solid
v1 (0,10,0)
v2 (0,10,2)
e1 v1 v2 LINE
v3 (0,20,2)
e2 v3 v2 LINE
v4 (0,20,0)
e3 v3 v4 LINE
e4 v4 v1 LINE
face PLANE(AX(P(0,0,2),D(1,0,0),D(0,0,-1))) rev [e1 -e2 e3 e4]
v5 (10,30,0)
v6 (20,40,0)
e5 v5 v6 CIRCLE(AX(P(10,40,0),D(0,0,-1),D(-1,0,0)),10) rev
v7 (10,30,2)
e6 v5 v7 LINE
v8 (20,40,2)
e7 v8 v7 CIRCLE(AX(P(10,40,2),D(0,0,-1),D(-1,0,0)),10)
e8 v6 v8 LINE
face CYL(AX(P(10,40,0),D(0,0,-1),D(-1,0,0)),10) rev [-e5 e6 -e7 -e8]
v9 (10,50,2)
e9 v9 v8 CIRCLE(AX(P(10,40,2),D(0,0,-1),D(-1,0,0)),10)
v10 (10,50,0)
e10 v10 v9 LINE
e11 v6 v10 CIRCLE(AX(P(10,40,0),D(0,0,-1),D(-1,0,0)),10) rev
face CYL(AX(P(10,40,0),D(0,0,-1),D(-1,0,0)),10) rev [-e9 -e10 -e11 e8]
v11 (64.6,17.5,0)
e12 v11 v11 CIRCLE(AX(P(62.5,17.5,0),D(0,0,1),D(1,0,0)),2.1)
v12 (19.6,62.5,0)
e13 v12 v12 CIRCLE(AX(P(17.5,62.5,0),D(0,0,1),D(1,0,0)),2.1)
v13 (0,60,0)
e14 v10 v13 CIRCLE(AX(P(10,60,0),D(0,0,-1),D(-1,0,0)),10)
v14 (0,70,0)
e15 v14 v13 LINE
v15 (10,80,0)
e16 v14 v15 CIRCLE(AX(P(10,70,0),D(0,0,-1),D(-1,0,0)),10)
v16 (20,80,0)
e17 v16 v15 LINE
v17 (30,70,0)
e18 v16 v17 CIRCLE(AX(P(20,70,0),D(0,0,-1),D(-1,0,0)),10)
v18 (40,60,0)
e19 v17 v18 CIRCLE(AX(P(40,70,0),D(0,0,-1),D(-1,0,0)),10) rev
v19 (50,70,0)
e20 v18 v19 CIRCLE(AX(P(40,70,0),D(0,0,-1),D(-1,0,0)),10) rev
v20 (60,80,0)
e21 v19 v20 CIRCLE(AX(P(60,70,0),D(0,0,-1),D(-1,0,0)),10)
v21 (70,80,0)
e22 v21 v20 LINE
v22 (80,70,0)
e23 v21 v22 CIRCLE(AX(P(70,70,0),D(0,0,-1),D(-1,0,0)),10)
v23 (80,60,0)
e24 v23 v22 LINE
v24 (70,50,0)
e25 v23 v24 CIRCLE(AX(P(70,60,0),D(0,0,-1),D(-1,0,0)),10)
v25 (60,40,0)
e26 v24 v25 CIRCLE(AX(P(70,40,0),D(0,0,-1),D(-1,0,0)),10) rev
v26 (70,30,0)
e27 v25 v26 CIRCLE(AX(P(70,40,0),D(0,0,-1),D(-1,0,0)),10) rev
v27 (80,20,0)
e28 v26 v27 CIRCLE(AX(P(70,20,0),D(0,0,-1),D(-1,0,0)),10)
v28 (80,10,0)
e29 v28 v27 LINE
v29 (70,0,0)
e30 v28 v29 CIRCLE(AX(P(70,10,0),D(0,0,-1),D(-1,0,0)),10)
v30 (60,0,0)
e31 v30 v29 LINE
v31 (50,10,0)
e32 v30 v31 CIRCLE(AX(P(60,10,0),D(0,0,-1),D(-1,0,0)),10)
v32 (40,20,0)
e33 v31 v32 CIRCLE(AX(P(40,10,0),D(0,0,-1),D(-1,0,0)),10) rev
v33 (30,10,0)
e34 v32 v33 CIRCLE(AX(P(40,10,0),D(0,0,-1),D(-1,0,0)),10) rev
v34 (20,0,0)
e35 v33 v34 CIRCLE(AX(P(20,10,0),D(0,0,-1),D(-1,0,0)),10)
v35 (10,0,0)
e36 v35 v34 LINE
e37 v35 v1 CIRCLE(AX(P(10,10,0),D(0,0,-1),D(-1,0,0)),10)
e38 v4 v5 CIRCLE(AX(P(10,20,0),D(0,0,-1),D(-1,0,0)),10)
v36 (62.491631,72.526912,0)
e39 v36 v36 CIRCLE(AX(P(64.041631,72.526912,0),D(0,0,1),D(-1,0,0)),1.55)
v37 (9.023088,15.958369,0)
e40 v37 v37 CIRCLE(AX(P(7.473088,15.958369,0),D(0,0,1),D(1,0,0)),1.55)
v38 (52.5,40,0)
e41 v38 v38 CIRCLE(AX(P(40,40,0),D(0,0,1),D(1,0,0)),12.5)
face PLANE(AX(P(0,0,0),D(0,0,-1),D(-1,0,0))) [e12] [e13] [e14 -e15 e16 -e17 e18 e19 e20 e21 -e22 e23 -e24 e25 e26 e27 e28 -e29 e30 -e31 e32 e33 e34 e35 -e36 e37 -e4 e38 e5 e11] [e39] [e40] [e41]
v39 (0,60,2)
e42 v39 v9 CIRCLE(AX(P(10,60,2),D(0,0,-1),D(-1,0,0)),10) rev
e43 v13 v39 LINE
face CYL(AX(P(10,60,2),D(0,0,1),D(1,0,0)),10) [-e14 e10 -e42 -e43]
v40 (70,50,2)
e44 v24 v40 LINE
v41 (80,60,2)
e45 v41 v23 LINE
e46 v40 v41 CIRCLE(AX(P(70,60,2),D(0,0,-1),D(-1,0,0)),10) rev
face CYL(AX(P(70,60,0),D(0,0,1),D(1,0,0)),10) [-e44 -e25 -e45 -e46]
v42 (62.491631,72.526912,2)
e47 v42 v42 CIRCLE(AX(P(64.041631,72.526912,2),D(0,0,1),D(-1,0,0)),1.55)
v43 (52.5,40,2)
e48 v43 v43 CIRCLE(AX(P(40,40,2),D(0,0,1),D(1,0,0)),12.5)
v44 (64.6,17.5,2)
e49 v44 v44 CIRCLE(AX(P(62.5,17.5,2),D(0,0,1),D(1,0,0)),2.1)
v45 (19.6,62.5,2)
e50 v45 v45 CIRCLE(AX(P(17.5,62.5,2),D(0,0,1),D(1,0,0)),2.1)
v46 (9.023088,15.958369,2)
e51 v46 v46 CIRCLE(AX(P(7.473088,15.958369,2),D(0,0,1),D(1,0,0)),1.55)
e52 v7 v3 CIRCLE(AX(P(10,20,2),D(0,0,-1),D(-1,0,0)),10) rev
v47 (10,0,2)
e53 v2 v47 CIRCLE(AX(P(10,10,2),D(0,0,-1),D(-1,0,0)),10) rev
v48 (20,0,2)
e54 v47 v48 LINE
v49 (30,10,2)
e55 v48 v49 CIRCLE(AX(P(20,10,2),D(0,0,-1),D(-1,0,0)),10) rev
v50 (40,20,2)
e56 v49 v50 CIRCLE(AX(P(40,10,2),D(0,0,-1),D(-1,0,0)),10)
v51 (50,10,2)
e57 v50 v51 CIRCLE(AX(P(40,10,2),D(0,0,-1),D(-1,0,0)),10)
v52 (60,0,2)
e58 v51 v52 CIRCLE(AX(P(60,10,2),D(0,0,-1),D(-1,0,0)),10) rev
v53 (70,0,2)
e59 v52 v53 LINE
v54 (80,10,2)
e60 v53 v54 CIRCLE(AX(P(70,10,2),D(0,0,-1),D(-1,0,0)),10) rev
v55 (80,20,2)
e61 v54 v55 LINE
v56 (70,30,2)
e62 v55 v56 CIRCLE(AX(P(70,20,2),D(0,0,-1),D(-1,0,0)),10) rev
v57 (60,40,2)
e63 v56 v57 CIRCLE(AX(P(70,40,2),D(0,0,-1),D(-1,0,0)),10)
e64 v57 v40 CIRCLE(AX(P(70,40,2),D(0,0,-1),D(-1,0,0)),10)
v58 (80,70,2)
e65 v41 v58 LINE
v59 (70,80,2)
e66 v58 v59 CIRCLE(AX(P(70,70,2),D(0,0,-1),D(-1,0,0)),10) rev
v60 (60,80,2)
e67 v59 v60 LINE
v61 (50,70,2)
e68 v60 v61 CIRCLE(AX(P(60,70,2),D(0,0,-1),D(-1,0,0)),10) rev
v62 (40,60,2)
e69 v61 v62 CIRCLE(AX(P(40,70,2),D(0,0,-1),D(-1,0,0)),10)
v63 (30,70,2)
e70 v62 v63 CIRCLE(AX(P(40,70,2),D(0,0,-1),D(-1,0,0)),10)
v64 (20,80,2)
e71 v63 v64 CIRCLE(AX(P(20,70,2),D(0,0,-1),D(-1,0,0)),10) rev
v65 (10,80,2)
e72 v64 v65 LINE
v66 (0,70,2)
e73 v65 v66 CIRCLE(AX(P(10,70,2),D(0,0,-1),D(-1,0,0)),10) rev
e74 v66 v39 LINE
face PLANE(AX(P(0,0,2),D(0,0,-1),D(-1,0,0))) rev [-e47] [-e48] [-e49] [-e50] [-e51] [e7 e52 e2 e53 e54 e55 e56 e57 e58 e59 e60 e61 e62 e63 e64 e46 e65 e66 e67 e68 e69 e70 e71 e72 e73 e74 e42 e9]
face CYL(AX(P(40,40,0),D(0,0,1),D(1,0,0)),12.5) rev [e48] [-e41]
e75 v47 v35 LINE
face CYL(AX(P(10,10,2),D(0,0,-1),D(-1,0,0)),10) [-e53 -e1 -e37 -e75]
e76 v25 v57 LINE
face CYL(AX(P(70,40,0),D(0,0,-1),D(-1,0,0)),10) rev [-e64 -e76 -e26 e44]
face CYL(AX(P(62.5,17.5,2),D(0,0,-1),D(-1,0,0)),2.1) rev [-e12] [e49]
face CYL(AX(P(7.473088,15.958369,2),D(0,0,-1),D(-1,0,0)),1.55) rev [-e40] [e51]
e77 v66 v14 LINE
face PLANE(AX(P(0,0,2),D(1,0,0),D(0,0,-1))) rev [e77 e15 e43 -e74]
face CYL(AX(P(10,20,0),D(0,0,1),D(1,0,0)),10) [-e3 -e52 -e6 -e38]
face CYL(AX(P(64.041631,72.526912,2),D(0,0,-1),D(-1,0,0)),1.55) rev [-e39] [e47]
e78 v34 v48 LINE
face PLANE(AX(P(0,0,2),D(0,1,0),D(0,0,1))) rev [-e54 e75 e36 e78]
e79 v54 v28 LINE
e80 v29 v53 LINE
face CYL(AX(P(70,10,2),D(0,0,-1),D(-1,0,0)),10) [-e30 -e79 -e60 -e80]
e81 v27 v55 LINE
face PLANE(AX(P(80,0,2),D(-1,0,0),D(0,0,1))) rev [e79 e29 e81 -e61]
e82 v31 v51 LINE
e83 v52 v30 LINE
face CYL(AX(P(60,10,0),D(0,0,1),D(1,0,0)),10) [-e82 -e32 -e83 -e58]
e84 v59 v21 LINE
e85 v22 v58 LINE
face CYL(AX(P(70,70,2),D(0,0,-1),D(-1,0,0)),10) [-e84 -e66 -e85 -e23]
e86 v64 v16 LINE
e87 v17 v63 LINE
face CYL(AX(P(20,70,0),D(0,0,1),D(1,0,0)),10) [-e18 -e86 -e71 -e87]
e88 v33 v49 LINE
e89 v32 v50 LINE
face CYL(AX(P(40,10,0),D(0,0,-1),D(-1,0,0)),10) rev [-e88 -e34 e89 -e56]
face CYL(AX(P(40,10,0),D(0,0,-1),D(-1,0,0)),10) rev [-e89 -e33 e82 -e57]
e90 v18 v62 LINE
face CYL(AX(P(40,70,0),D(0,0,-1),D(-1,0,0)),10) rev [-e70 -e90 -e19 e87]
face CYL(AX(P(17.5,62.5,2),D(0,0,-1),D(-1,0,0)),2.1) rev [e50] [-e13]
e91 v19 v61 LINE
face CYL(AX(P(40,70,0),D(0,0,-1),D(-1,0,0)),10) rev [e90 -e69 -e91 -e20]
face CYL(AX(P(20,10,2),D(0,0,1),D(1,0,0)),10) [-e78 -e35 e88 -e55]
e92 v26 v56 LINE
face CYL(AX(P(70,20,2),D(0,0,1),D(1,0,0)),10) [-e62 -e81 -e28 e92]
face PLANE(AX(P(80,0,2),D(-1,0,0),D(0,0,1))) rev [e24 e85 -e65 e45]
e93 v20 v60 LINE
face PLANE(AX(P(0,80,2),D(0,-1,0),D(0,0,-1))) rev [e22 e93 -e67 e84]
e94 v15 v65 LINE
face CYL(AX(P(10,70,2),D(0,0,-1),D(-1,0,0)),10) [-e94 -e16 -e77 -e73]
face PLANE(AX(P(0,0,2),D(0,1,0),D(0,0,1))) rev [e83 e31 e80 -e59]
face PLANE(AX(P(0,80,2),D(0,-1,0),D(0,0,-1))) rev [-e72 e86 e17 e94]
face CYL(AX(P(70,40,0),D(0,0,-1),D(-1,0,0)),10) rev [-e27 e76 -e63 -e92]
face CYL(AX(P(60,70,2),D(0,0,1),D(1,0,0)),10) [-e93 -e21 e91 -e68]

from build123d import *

# Parameters (mm, degrees)
SKETCH_1_W          = 80
SKETCH_1_H          = 80
SKETCH_1_R          = 2.1
SKETCH_1_R_2        = 1.55
EXTRUDE_1_DEPTH     = 2
SKETCH_2_W          = 20
SKETCH_2_H          = 20
CUT_EXTRUDE_1_DEPTH = 2
FILLET_1_R          = 10
SKETCH_3_R          = 12.5
CUT_EXTRUDE_2_DEPTH = 2


with BuildPart() as part:
    # 草图1 → 凸台-拉伸1 (new body)
    with BuildSketch(Plane.XY):
        with Locations((40, 40)):
            Rectangle(SKETCH_1_W, SKETCH_1_H)
        with Locations((17.5, 62.5)):
            Circle(SKETCH_1_R, mode=Mode.SUBTRACT)
        with Locations((62.5, 17.5)):
            Circle(SKETCH_1_R, mode=Mode.SUBTRACT)
        with Locations((7.473088065, 15.95836944)):
            Circle(SKETCH_1_R_2, mode=Mode.SUBTRACT)
        with Locations(Location((64.04163056, 72.526911935, 0), (0, 0, 180))):
            Circle(SKETCH_1_R_2, mode=Mode.SUBTRACT)
    extrude(amount=EXTRUDE_1_DEPTH)

    # 草图2 → 切除-拉伸1 (cut)
    with BuildSketch(Plane.XY.offset(2)):
        with Locations((40, 70)):
            Rectangle(SKETCH_2_W, SKETCH_2_H)
        with Locations((70, 40)):
            Rectangle(SKETCH_2_W, SKETCH_2_H)
        with Locations((40, 10)):
            Rectangle(SKETCH_2_W, SKETCH_2_H)
        with Locations((10, 40)):
            Rectangle(SKETCH_2_W, SKETCH_2_H)
    extrude(amount=-CUT_EXTRUDE_1_DEPTH, mode=Mode.SUBTRACT)

    # 圆角1
    fillet_1_edges = [part.edges().sort_by_distance(p)[0] for p in [
        (0, 50, 1),
        (20, 50, 1),
        (20, 30, 1),
        (0, 30, 1),
        (0, 0, 1),
        (30, 0, 1),
        (30, 20, 1),
        (50, 20, 1),
        (50, 0, 1),
        (80, 0, 1),
        (80, 30, 1),
        (60, 30, 1),
        (60, 50, 1),
        (80, 50, 1),
        (80, 80, 1),
        (50, 80, 1),
        (50, 60, 1),
        (30, 60, 1),
        (30, 80, 1),
        (0, 80, 1),
    ]]
    fillet(fillet_1_edges, radius=FILLET_1_R - 0.0001)  # a hair under: the kernel refuses the full size

    # 草图3 → 切除-拉伸2 (cut)
    with BuildSketch(Plane.XY.offset(2)):
        with Locations((40, 40)):
            Circle(SKETCH_3_R)
    extrude(amount=-CUT_EXTRUDE_2_DEPTH, mode=Mode.SUBTRACT)


solid = part.part
